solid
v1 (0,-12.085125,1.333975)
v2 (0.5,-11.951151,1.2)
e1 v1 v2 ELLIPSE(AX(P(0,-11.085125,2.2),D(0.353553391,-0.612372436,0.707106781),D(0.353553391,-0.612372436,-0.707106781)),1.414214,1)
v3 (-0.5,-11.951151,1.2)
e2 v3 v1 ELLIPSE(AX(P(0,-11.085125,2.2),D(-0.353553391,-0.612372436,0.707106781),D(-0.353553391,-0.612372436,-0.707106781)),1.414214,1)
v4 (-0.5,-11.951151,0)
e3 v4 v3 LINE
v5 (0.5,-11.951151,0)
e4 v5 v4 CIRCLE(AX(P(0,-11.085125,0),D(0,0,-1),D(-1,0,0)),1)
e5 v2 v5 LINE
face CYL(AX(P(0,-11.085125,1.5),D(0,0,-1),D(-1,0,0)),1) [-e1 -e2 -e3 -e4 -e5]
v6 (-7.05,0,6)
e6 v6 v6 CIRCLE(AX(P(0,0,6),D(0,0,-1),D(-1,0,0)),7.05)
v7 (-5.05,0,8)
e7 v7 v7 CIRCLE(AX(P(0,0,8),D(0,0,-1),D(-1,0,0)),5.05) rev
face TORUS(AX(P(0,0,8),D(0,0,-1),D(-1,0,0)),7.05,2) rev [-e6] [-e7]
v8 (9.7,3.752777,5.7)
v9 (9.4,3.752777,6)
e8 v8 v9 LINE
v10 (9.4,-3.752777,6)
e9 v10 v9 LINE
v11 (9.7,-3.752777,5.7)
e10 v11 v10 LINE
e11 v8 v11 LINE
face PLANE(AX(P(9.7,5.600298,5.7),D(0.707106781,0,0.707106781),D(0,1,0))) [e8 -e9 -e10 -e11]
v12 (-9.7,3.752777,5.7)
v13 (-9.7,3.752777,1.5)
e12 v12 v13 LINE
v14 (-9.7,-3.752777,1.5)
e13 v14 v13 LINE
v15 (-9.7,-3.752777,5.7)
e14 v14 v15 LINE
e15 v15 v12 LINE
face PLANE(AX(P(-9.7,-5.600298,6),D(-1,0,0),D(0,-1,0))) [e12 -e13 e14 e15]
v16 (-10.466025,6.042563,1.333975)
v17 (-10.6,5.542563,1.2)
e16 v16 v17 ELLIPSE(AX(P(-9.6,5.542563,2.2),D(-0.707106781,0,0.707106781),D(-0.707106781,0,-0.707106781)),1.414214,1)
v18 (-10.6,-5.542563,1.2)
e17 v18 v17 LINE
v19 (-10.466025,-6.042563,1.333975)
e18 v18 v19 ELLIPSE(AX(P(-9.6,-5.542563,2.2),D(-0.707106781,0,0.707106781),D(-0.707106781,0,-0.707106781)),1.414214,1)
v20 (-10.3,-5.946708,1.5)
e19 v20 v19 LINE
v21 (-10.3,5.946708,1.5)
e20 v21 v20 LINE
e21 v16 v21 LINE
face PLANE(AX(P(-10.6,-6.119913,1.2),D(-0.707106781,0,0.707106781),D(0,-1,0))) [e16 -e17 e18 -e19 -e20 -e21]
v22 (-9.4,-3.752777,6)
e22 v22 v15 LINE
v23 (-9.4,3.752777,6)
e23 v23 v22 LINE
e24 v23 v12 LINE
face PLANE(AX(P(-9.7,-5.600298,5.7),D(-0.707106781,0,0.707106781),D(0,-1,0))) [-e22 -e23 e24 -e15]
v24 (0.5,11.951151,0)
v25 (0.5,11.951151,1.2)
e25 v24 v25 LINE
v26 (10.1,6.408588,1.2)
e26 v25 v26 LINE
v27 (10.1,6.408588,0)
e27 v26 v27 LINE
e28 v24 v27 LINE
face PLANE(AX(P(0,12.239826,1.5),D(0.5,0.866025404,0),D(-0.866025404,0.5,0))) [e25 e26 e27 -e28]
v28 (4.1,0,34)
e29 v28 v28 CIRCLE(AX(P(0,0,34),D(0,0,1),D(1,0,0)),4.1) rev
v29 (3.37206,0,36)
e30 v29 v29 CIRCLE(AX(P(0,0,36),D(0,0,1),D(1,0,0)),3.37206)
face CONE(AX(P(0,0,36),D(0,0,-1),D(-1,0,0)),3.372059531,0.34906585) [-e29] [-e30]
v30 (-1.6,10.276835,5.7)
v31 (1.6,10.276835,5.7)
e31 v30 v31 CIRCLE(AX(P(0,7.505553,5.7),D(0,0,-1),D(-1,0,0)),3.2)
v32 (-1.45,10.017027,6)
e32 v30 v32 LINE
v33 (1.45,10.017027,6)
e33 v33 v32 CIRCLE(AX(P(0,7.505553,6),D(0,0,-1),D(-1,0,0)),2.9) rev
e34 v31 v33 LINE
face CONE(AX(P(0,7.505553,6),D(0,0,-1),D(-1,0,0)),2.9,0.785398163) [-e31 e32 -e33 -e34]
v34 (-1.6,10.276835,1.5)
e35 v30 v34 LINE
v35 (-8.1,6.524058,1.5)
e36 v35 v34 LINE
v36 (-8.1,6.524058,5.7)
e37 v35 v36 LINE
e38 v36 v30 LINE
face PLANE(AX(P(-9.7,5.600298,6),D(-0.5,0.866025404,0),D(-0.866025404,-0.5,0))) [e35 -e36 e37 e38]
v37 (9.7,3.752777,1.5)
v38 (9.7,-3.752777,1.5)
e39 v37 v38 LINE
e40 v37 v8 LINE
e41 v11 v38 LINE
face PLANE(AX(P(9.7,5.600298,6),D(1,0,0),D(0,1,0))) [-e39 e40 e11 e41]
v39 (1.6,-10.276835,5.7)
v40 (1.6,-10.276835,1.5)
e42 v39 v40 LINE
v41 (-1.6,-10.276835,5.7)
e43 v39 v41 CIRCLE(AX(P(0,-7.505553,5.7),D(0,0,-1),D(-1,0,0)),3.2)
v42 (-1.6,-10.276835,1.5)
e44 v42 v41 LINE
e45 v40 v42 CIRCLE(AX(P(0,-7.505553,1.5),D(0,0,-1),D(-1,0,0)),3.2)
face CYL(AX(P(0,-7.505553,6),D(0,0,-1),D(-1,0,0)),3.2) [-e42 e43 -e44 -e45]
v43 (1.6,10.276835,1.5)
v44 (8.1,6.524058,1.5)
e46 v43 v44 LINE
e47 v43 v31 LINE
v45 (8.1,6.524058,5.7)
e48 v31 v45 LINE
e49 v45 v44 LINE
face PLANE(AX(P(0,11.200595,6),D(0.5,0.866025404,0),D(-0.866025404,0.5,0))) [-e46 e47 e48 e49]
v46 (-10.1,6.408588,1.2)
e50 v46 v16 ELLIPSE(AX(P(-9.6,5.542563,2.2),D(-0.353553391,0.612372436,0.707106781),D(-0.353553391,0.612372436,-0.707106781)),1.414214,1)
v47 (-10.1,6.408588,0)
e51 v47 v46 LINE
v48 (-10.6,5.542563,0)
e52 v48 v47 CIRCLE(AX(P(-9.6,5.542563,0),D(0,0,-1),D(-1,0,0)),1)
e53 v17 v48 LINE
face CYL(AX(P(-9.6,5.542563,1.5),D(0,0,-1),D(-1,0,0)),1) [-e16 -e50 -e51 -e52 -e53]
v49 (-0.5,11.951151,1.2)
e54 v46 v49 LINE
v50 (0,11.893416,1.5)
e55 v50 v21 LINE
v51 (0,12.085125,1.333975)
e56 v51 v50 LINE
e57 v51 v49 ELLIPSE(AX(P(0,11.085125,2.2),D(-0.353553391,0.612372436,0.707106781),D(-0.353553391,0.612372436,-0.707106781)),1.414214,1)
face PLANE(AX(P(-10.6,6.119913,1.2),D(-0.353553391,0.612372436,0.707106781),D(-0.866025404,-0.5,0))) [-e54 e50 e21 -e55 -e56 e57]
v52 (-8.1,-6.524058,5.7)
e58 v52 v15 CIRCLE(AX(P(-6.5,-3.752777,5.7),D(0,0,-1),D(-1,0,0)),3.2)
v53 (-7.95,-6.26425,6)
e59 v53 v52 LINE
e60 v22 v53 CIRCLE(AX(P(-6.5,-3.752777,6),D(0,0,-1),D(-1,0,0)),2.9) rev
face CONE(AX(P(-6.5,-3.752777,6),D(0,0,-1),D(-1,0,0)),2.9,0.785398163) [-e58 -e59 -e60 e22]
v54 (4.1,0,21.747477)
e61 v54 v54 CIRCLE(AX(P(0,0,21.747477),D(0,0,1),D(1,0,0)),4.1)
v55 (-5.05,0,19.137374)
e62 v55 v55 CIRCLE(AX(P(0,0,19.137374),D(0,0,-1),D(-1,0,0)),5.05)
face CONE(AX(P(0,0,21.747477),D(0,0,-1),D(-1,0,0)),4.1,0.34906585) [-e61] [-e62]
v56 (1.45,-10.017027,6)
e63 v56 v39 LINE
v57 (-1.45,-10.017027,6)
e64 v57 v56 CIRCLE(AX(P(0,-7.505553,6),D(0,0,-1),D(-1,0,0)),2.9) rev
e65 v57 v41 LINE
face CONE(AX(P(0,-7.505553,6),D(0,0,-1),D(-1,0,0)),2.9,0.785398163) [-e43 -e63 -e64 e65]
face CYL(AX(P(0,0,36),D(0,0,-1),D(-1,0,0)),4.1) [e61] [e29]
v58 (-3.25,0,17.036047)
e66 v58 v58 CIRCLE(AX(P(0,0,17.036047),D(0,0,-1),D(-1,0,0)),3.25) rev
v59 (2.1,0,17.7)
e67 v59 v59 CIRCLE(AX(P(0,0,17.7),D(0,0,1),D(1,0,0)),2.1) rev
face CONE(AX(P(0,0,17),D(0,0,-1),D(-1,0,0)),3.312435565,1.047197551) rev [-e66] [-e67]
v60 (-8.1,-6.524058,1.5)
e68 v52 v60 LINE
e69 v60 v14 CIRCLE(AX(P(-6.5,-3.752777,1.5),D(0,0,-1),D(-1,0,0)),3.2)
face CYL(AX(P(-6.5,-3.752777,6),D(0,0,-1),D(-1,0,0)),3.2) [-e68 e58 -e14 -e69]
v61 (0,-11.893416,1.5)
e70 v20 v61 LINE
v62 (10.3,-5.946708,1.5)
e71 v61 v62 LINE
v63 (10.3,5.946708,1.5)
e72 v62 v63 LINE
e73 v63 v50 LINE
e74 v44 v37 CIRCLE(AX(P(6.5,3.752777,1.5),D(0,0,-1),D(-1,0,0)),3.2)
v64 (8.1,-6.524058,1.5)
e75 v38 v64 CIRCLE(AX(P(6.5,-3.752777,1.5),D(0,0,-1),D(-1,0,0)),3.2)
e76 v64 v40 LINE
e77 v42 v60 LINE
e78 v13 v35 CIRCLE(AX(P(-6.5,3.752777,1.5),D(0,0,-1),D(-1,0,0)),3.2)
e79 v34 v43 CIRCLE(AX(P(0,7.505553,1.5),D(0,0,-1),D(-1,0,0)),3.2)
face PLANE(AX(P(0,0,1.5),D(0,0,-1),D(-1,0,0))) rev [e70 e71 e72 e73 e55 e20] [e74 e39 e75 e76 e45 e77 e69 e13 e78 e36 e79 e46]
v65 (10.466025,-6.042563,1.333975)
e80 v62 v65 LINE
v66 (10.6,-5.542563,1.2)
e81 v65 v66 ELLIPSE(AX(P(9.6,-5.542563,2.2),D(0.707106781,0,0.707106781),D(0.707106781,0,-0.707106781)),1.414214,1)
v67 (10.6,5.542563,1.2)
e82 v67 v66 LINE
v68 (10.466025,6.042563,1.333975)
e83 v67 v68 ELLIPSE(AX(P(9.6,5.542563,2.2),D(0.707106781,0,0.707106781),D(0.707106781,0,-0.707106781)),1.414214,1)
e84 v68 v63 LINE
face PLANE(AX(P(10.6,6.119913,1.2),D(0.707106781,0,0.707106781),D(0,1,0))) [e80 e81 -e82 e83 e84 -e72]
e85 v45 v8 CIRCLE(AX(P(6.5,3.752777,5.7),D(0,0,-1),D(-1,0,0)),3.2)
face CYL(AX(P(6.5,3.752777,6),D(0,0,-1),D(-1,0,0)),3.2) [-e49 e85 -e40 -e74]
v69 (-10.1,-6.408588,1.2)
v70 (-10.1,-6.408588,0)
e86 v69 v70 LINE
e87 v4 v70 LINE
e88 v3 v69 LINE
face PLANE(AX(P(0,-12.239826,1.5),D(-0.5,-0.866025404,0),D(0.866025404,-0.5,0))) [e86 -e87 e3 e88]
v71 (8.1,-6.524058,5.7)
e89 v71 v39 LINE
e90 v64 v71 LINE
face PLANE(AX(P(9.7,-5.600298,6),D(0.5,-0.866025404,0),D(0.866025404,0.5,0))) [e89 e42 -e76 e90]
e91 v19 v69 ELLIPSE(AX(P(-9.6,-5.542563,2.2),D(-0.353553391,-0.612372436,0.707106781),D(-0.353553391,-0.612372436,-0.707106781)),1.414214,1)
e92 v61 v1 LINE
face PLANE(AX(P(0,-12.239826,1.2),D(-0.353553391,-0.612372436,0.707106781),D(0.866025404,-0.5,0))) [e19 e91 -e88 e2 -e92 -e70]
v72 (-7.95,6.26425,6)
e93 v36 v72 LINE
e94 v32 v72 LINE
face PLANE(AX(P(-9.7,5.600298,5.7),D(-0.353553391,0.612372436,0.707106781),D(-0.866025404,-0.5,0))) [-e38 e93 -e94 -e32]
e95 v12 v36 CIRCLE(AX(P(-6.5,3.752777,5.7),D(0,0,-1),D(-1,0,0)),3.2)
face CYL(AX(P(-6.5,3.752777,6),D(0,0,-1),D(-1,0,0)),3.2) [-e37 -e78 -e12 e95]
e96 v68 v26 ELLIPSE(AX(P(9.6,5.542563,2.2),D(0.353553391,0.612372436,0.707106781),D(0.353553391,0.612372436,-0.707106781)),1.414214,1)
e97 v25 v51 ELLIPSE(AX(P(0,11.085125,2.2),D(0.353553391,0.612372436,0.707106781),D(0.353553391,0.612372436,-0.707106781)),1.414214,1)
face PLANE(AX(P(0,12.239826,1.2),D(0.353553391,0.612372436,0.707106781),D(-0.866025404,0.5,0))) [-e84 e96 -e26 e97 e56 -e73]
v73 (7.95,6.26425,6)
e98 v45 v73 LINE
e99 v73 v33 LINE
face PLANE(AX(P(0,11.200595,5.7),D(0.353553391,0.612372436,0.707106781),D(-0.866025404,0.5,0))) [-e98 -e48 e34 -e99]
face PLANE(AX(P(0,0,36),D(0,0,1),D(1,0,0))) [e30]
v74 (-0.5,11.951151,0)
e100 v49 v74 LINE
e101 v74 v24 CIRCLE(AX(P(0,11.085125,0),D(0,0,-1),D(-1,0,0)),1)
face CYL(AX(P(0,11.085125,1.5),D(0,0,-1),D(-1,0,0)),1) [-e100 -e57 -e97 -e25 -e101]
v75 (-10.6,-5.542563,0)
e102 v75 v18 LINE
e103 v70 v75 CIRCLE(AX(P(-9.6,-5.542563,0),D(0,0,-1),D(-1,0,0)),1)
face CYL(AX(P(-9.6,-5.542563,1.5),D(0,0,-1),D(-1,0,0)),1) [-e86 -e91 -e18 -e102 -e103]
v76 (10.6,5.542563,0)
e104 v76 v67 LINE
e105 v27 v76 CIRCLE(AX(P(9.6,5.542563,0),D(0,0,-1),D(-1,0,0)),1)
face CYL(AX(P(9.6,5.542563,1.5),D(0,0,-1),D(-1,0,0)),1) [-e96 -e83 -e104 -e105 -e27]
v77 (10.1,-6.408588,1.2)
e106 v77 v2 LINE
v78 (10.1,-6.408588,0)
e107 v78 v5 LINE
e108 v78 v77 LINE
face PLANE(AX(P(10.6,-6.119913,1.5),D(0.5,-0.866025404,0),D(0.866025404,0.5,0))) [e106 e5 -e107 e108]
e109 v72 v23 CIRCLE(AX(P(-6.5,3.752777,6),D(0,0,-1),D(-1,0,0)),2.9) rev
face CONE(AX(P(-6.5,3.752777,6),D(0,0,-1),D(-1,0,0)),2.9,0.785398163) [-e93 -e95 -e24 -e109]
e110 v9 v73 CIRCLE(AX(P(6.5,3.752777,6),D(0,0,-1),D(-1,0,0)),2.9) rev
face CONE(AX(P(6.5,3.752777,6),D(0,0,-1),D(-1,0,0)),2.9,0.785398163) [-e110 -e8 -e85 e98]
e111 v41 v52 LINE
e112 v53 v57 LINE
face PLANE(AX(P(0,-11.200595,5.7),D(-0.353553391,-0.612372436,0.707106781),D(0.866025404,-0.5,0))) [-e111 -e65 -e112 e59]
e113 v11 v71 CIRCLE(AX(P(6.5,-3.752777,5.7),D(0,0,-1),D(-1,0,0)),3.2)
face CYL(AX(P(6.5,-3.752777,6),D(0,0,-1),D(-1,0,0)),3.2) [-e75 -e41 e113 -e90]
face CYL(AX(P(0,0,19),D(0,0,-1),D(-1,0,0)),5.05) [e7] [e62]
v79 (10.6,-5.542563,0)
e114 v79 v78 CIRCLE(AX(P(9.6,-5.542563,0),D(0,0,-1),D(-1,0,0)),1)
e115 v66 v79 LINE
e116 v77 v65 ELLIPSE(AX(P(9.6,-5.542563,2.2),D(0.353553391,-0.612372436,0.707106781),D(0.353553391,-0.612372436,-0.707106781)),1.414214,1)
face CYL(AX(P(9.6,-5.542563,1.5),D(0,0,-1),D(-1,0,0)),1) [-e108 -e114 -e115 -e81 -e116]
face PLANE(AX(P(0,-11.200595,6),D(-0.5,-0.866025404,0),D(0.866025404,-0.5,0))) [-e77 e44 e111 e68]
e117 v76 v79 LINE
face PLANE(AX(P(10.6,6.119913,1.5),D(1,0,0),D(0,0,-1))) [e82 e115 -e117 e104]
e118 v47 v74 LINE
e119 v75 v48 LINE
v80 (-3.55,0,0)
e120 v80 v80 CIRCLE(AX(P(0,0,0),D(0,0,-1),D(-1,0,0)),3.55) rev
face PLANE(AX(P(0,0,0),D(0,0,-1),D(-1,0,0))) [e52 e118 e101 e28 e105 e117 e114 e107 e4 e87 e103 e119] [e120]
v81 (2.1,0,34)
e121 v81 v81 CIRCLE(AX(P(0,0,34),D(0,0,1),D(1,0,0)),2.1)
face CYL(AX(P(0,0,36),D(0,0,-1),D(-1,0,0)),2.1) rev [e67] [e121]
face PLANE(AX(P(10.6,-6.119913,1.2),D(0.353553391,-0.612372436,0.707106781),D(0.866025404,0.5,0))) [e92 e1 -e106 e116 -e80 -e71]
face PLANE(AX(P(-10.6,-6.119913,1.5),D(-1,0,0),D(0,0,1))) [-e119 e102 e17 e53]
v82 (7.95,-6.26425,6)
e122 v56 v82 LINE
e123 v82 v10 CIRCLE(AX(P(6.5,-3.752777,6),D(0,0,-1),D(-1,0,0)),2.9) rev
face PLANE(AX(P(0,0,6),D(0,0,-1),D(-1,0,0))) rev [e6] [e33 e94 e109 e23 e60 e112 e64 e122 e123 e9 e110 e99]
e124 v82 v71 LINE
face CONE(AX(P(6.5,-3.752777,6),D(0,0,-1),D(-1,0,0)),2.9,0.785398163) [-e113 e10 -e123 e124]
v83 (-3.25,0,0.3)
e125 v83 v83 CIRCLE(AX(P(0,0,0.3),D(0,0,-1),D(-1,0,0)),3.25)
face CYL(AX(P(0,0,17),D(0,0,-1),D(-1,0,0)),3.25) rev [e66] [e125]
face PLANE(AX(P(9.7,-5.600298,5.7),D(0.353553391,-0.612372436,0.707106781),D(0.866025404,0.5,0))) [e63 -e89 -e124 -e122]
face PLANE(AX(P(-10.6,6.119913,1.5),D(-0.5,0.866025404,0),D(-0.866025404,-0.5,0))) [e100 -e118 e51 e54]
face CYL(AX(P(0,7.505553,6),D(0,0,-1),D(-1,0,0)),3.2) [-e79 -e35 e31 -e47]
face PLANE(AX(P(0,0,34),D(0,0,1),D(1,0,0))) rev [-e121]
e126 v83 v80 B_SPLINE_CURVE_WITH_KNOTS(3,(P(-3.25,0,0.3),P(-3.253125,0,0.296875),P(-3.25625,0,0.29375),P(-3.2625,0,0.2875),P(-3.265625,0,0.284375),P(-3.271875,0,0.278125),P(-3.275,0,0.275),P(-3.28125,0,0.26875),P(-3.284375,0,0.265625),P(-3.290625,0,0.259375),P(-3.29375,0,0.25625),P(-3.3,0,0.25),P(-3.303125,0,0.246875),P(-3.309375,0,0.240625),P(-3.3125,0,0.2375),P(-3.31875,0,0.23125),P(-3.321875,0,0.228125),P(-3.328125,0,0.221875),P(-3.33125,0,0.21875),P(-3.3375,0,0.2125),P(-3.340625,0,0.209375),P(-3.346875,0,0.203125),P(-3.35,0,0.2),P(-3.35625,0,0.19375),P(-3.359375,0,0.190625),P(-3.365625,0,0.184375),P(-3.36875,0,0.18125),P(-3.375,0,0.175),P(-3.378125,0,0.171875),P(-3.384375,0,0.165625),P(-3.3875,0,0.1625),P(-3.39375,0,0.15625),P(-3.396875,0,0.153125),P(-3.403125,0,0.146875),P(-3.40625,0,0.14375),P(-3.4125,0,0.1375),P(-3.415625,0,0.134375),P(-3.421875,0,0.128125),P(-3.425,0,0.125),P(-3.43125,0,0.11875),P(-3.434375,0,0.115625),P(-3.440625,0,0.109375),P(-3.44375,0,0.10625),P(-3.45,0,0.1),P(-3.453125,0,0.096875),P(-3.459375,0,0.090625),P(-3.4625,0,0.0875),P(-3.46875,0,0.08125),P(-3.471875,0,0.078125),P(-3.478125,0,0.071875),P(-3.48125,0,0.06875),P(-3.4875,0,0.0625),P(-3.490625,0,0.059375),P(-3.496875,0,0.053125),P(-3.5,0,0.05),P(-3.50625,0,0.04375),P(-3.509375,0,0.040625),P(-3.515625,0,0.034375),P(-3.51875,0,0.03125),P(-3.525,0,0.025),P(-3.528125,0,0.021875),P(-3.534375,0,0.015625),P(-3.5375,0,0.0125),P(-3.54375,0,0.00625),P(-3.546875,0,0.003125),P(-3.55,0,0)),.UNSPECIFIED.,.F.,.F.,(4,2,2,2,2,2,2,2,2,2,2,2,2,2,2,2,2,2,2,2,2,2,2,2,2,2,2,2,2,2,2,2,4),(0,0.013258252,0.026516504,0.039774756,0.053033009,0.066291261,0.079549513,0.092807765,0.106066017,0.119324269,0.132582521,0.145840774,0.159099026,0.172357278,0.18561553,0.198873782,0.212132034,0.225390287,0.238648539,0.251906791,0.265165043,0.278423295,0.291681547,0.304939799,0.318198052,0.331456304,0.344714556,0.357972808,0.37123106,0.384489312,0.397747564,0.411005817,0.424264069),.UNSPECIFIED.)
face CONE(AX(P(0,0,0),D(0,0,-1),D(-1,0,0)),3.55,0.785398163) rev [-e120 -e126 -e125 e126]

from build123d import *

# Parameters (mm, degrees)
BOSS_EXTRUDE1_DEPTH  = 1.5
SKETCH1_8_R          = 4.1
BOSS_EXTRUDE3_DEPTH  = 36
SKETCH1_9_R          = 5.05
BOSS_EXTRUDE4_DEPTH  = 19
SHELL1_START         = 2
SHELL1_OUTLINE_R     = 2.1
SHELL1_DEPTH         = 32
SHELL1_2_OUTLINE_R   = 3.05
SHELL1_2_OUTLINE_R_2 = 2.1
SHELL1_2_DEPTH       = 15
SKETCH1_10_R         = 3.25
CUT_EXTRUDE1_DEPTH   = 17
SKETCH1_3_R          = 3.25
BOSS_EXTRUDE2_DEPTH  = 6
CHAMFER1_SIZE        = 2
CHAMFER1_SIZE2       = 0.727940469
CHAMFER2_SIZE        = 2.747477419
CHAMFER2_SIZE_2      = 1
CHAMFER3_SIZE        = 1.212435565
CHAMFER3_SIZE_2      = 0.7
CHAMFER6_SIZE        = 0.3
FILLET1_R            = 3.2
CHAMFER5_SIZE        = 0.3
FILLET2_R            = 1
FILLET3_R            = 2


# Read off the part's stored shape, not the designer's step: Shell1
with BuildPart() as part:
    # Sketch1 → Boss-Extrude1 (new body)
    with BuildSketch(Plane.XY):
        Polygon((-10.6, 6.119912853), (0, 12.239825707), (10.6, 6.119912853), (10.6, -6.119912853), (0, -12.239825707), (-10.6, -6.119912853), align=None)
    extrude(amount=BOSS_EXTRUDE1_DEPTH)

    # Sketch1<8> → Boss-Extrude3 (add)
    with BuildSketch(Plane.XY):
        with Locations(Location((0, 0, 0), (0, 0, 180))):
            Circle(SKETCH1_8_R)
    extrude(amount=BOSS_EXTRUDE3_DEPTH)

    # Sketch1<9> → Boss-Extrude4 (add)
    with BuildSketch(Plane.XY):
        with Locations(Location((0, 0, 0), (0, 0, 180))):
            Circle(SKETCH1_9_R)
    extrude(amount=BOSS_EXTRUDE4_DEPTH)

    # Shell1 outline → Shell1 (cut)
    with BuildSketch(Plane.XY.offset(SHELL1_START)):
        Circle(SHELL1_OUTLINE_R)
    extrude(amount=SHELL1_DEPTH, mode=Mode.SUBTRACT)

    # Shell1 2 outline → Shell1 2 (cut)
    with BuildSketch(Plane.XY.offset(SHELL1_START)):
        Circle(SHELL1_2_OUTLINE_R)
        Circle(SHELL1_2_OUTLINE_R_2, mode=Mode.SUBTRACT)
    extrude(amount=SHELL1_2_DEPTH, mode=Mode.SUBTRACT)

    # Sketch1<10> → Cut-Extrude1 (cut)
    with BuildSketch(Plane.XY):
        Circle(SKETCH1_10_R)
    extrude(amount=CUT_EXTRUDE1_DEPTH, mode=Mode.SUBTRACT)

    # Sketch1<3> → Boss-Extrude2 (add)
    with BuildSketch(Plane.XY):
        Polygon((0, 11.200595222), (9.7, 5.600297611), (9.7, -5.600297611), (0, -11.200595222), (-9.7, -5.600297611), (-9.7, 5.600297611), align=None)
        Circle(SKETCH1_3_R, mode=Mode.SUBTRACT)
    extrude(amount=BOSS_EXTRUDE2_DEPTH)

    # Chamfer1
    chamfer1_edges = [part.edges().sort_by_distance(p)[0] for p in [
        (4.1, 0, 36),
    ]]
    chamfer1_side = [part.faces().sort_by_distance(p)[0] for p in [
        (4.1, 0, 27.5),
    ]]
    chamfer(chamfer1_edges, length=CHAMFER1_SIZE, length2=CHAMFER1_SIZE2, reference=chamfer1_side[0])

    # Chamfer2
    # the kernel refuses this chamfer: 2.747477419, 1 mm, written as the material it adds along each edge
    with BuildSketch(Plane(origin=(0, 0, 19), x_dir=(-1, 0, 0), z_dir=(0, -1, 0))) as chamfer2_piece_1_section:
        Polygon((4.1, -CHAMFER2_SIZE), (4.1 + CHAMFER2_SIZE_2, 0), (4.1, 0), align=None)
    chamfer2_piece_1 = revolve(axis=Axis((0, 0, 19), (0, 0, -1)), mode=Mode.PRIVATE)
    chamfer2_piece_1 = chamfer2_piece_1 & Plane(origin=(0, 0, 20.481947897), x_dir=(-1, 0, 0), z_dir=(0, 0, -1)) * Cylinder(5.05, 21, mode=Mode.PRIVATE)
    add(chamfer2_piece_1)

    # Chamfer3
    # the kernel refuses this chamfer: 1.212435565, 0.7 mm, written as the material it takes off along each edge
    with BuildSketch(Plane(origin=(0, 0, 17), x_dir=(1, 0, 0), z_dir=(0, -1, 0))) as chamfer3_piece_1_section:
        Polygon((2.1 + CHAMFER3_SIZE, 0), (2.1, CHAMFER3_SIZE_2), (2.1, 0), align=None)
    chamfer3_piece_1 = revolve(axis=Axis((0, 0, 17), (0, 0, 1)), mode=Mode.PRIVATE)
    chamfer3_piece_1 = chamfer3_piece_1 & Plane(origin=(0, 0, 17.363214185), x_dir=(1, 0, 0), z_dir=(0, 0, -1)) * Cylinder(3.25, 14, mode=Mode.PRIVATE)
    add(chamfer3_piece_1, mode=Mode.SUBTRACT)

    # Chamfer6
    chamfer6_edges = [part.edges().sort_by_distance(p)[0] for p in [
        (-3.25, 0, 0),
    ]]
    chamfer(chamfer6_edges, length=CHAMFER6_SIZE)

    # Fillet1
    fillet1_edges = [part.edges().sort_by_distance(p)[0] for p in [
        (-9.7, -5.600297611, 3.75),
        (0, -11.200595222, 3.75),
        (9.7, -5.600297611, 3.75),
        (9.7, 5.600297611, 3.75),
        (0, 11.200595222, 3.75),
        (-9.7, 5.600297611, 3.75),
    ]]
    fillet(fillet1_edges, radius=FILLET1_R)

    # Chamfer5
    chamfer5_edges = [part.edges().sort_by_distance(p)[0] for p in [
        (-4.85, -8.400446417, 6),
        (4.85, 8.400446417, 6),
        (-4.85, 8.400446417, 6),
        (-9.7, 0, 6),
        (9.271281292, 5.35277675, 6),
        (0, 10.705553499, 6),
        (-9.271281292, 5.35277675, 6),
        (-9.271281292, -5.35277675, 6),
        (0, -10.705553499, 6),
        (9.271281292, -5.35277675, 6),
        (5.3, 9.17986928, 1.5),
        (10.6, 0, 1.5),
        (5.3, -9.17986928, 1.5),
        (-5.3, -9.17986928, 1.5),
        (-10.6, 0, 1.5),
        (-5.3, 9.17986928, 1.5),
        (9.7, 0, 6),
        (4.85, -8.400446417, 6),
    ]]
    chamfer(chamfer5_edges, length=CHAMFER5_SIZE)

    # Fillet2
    fillet2_edges = [part.edges().sort_by_distance(p)[0] for p in [
        (10.6, 6.119912853, 0.6),
        (10.6, -6.119912853, 0.6),
        (0, -12.239825707, 0.6),
        (-10.6, -6.119912853, 0.6),
        (-10.6, 6.119912853, 0.6),
        (0, 12.239825707, 0.6),
    ]]
    fillet(fillet2_edges, radius=FILLET2_R)

    # Fillet3
    fillet3_edges = [part.edges().sort_by_distance(p)[0] for p in [
        (5.05, 0, 6),
    ]]
    fillet(fillet3_edges, radius=FILLET3_R)


solid = part.part
